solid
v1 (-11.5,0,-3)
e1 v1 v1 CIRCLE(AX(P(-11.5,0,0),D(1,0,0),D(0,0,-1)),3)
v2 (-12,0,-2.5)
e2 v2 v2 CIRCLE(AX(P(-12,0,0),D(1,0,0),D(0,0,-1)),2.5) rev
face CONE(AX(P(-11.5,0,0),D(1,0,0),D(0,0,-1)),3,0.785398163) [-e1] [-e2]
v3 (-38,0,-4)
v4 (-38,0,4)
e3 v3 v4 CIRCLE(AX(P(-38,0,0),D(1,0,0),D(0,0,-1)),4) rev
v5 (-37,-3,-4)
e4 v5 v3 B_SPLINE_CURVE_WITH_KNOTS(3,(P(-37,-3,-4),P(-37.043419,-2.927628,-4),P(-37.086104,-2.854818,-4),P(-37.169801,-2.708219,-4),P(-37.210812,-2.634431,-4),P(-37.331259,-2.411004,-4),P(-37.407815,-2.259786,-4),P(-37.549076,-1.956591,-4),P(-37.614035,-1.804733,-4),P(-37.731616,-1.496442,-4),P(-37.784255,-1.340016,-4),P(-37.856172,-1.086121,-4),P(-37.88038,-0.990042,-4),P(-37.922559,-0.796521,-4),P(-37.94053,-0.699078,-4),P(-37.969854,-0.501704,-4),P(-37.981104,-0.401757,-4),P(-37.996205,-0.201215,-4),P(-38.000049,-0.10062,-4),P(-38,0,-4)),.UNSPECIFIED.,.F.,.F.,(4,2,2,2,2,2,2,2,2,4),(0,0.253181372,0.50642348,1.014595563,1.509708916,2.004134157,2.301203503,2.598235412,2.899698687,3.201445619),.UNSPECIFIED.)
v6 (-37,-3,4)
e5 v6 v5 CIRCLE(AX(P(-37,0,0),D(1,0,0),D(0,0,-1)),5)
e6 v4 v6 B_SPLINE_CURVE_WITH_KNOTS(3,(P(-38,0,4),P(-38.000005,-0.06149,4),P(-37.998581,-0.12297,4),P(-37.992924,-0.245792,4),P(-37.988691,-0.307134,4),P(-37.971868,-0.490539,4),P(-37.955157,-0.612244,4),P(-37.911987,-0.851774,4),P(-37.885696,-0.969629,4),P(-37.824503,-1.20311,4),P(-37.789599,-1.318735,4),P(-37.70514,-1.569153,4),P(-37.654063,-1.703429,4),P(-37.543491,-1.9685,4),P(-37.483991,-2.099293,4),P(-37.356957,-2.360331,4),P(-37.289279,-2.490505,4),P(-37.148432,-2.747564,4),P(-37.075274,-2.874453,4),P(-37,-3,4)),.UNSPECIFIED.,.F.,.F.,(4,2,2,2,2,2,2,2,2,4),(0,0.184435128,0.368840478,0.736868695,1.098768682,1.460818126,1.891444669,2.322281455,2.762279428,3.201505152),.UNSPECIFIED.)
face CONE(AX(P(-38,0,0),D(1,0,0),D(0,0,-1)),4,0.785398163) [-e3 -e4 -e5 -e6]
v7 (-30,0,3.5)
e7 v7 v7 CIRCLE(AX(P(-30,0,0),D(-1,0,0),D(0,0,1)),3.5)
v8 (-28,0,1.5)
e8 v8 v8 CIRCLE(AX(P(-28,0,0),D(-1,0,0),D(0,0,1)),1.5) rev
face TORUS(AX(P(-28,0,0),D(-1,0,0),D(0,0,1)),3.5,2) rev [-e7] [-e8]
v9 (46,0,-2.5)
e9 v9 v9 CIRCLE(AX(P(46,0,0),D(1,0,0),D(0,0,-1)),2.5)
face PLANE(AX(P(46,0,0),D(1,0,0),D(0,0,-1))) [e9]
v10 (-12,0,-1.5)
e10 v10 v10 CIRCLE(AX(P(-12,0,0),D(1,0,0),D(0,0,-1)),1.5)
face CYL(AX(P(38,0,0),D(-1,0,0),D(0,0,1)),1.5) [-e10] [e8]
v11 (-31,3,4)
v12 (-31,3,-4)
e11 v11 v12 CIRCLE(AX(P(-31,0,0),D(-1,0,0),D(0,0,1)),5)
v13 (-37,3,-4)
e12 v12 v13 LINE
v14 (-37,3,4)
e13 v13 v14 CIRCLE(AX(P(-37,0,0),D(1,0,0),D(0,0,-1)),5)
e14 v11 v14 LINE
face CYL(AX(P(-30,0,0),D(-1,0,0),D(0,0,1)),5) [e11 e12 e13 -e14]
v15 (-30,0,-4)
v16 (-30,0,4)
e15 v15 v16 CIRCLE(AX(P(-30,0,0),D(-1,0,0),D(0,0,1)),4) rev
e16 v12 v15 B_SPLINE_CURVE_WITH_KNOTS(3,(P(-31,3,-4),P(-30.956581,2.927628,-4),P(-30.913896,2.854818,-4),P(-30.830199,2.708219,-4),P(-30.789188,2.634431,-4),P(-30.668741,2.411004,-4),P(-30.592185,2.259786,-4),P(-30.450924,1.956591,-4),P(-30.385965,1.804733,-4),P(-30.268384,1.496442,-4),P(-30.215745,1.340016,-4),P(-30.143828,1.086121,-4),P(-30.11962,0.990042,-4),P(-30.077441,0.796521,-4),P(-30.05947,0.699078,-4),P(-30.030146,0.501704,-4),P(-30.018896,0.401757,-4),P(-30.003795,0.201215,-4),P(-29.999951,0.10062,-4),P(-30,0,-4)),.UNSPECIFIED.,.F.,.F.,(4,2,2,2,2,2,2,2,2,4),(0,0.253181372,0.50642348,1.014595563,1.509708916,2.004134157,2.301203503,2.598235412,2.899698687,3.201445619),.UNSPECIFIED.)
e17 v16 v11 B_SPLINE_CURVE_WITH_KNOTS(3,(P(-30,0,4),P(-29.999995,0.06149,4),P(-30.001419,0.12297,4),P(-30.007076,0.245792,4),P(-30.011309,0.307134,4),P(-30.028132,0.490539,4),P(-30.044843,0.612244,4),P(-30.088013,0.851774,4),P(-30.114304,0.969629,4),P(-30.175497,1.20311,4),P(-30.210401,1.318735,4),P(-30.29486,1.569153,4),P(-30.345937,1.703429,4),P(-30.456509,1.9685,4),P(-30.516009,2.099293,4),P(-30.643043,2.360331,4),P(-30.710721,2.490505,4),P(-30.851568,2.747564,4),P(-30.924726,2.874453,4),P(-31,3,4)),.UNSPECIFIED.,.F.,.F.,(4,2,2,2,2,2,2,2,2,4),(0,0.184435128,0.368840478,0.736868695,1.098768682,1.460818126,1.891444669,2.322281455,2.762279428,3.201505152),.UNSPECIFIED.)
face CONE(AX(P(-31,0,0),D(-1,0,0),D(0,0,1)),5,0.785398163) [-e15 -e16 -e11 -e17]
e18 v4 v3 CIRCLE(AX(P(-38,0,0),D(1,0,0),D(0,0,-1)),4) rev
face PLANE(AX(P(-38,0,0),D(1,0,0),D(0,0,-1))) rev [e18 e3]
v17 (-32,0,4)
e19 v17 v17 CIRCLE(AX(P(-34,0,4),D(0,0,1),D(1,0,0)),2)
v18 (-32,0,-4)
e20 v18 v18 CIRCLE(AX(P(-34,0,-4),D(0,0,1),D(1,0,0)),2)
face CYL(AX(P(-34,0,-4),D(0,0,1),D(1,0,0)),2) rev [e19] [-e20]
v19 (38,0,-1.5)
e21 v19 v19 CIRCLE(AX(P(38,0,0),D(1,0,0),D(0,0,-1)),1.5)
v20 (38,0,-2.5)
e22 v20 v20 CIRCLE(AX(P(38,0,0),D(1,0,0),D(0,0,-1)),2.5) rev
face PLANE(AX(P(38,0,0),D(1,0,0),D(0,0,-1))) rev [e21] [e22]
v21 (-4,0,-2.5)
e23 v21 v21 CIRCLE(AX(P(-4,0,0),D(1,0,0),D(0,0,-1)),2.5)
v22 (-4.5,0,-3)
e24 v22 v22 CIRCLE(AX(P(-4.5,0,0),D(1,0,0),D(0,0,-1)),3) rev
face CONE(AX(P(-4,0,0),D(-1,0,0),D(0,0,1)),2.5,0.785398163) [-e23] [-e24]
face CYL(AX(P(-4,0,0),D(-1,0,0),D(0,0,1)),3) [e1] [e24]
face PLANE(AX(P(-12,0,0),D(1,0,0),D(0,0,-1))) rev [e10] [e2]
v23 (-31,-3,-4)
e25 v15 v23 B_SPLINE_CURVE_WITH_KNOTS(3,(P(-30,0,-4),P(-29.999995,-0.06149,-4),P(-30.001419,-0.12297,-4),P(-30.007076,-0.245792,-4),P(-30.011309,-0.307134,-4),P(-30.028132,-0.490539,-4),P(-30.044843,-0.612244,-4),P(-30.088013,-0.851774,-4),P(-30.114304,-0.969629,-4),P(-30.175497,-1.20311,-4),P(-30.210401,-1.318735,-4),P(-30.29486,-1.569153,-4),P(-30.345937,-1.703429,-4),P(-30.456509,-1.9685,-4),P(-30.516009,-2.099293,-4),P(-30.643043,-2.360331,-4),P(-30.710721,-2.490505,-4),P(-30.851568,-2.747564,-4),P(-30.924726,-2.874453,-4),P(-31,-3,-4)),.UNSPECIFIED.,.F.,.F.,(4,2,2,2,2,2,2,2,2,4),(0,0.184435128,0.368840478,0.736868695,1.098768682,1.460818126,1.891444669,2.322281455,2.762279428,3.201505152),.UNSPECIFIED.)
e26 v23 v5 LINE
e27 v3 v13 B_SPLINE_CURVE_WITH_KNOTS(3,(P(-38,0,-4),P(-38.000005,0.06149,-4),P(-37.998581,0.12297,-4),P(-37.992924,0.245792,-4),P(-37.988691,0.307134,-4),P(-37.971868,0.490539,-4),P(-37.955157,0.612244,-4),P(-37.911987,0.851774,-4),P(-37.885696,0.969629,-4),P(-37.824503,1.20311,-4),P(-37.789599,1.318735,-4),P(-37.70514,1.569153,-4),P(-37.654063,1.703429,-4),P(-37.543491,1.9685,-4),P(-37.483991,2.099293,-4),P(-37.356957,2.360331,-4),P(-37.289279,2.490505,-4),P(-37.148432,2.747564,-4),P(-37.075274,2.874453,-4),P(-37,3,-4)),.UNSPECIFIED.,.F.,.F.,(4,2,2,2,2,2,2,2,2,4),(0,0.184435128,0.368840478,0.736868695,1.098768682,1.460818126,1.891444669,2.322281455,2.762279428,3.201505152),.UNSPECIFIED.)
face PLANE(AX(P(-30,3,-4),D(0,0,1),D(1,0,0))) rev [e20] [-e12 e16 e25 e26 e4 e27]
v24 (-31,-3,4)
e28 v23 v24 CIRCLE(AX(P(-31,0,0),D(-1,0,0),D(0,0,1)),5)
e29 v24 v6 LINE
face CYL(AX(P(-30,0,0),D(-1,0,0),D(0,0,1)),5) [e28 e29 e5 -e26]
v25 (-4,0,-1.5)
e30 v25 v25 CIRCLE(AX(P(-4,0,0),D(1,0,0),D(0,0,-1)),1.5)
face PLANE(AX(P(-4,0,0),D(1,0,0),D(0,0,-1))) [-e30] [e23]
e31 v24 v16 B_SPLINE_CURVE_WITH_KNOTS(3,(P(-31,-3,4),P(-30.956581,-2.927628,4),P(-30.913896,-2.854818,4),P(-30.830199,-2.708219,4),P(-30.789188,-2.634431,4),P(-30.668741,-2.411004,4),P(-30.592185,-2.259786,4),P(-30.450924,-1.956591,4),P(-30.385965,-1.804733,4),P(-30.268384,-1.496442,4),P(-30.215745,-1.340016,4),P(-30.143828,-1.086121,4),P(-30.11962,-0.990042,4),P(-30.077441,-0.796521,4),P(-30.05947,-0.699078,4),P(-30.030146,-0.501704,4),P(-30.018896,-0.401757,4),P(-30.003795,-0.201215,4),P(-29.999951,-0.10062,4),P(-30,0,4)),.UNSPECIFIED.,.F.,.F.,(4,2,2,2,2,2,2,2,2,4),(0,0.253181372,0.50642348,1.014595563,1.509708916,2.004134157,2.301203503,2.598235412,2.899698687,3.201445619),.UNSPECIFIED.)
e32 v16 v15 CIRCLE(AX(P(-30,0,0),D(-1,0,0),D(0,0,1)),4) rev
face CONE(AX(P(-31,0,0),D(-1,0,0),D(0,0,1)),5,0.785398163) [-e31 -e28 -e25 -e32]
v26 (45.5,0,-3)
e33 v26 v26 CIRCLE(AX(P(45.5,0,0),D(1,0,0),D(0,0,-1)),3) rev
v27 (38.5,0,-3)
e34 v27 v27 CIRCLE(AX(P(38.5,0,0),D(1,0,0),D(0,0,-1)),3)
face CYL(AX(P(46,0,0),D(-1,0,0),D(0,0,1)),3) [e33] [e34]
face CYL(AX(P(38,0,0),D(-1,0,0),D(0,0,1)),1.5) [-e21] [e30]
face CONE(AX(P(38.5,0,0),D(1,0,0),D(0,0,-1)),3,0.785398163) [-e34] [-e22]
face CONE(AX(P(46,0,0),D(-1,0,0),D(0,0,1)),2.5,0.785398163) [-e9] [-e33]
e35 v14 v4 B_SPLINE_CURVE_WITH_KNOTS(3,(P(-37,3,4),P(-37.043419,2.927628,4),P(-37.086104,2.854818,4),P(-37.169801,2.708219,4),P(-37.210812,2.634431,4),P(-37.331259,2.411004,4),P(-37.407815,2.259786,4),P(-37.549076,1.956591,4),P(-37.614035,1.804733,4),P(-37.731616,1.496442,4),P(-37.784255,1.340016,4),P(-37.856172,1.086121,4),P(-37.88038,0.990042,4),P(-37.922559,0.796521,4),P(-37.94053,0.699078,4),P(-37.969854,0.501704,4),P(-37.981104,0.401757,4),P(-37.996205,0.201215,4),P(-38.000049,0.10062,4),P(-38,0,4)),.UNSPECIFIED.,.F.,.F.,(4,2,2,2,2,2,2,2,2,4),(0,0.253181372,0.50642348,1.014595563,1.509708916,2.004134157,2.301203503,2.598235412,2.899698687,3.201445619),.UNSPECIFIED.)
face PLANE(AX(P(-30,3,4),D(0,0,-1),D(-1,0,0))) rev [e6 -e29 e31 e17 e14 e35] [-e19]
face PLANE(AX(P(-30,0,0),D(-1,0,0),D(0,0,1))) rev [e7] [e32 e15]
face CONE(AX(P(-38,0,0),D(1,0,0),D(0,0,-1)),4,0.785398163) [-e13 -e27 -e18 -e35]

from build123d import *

# Parameters (mm, degrees)
SKETCH1_R           = 1.5
BOSS_EXTRUDE1_DEPTH = 38
SKETCH2_R           = 3
BOSS_EXTRUDE2_DEPTH = 8
BOSS_EXTRUDE3_START = -50
SKETCH2_2_R         = 3
BOSS_EXTRUDE3_DEPTH = 8
CHAMFER1_SIZE       = 0.5
SKETCH3_R           = 5
BOSS_EXTRUDE4_DEPTH = 8
CUT_EXTRUDE1_DEPTH  = 8
SKETCH5_R           = 2
CUT_EXTRUDE2_DEPTH  = 47.957427527
CHAMFER3_SIZE       = 1
FILLET1_R           = 2
CHAMFER4_SIZE       = 1


with BuildPart() as part:
    # Sketch1 → Boss-Extrude1 (new, symmetric)
    with BuildSketch(Plane(origin=(0, 0, 0), x_dir=(0, 0, -1), z_dir=(1, 0, 0))):
        Circle(SKETCH1_R)
    extrude(amount=BOSS_EXTRUDE1_DEPTH, both=True)

    # Sketch2 → Boss-Extrude2 (add)
    with BuildSketch(Plane(origin=(38, 0, 0), x_dir=(0, 0, -1), z_dir=(1, 0, 0))):
        Circle(SKETCH2_R)
    extrude(amount=BOSS_EXTRUDE2_DEPTH)

    # Sketch2<2> → Boss-Extrude3 (add)
    with BuildSketch(Plane(origin=(38, 0, 0), x_dir=(0, 0, -1), z_dir=(1, 0, 0)).offset(BOSS_EXTRUDE3_START)):
        Circle(SKETCH2_2_R)
    extrude(amount=BOSS_EXTRUDE3_DEPTH)

    # Chamfer1
    chamfer1_edges = [part.edges().sort_by_distance(p)[0] for p in [
        (-12, 0, 3),
        (-4, 0, 3),
        (38, 0, 3),
        (46, 0, 3),
    ]]
    chamfer(chamfer1_edges, length=CHAMFER1_SIZE)

    # Sketch3 → Boss-Extrude4 (add)
    with BuildSketch(Plane.ZY.offset(38)):
        Circle(SKETCH3_R)
    extrude(amount=-BOSS_EXTRUDE4_DEPTH)

    # Sketch4 → Cut-Extrude1 (cut)
    with BuildSketch(Plane.ZY.offset(38)):
        with BuildLine():
            Line((-4, 3), (-4, -3))
            ThreePointArc((-4, -3), (-5, 0), (-4, 3))
        make_face()
        with BuildLine():
            Line((4, 3), (4, -3))
            ThreePointArc((4, -3), (5, 0), (4, 3))
        make_face()
    extrude(amount=-CUT_EXTRUDE1_DEPTH, mode=Mode.SUBTRACT)

    # Sketch5 → Cut-Extrude2 (cut, through all)
    with BuildSketch(Plane.XY.offset(4)):
        with Locations((-34, 0)):
            Circle(SKETCH5_R)
    extrude(amount=-CUT_EXTRUDE2_DEPTH, mode=Mode.SUBTRACT)

    # Chamfer3
    chamfer3_edges = [part.edges().sort_by_distance(p)[0] for p in [
        (-38, 5, 0),
        (-38, -5, 0),
    ]]
    chamfer(chamfer3_edges, length=CHAMFER3_SIZE - 0.0001)  # a hair under: the kernel refuses the full size

    # Fillet1
    fillet1_edges = [part.edges().sort_by_distance(p)[0] for p in [
        (-30, 0, 1.5),
    ]]
    fillet(fillet1_edges, radius=FILLET1_R)

    # Chamfer4
    chamfer4_edges = [part.edges().sort_by_distance(p)[0] for p in [
        (-30, 5, 0),
        (-30, -5, 0),
    ]]
    chamfer(chamfer4_edges, length=CHAMFER4_SIZE - 0.0001)  # a hair under: the kernel refuses the full size


solid = part.part
